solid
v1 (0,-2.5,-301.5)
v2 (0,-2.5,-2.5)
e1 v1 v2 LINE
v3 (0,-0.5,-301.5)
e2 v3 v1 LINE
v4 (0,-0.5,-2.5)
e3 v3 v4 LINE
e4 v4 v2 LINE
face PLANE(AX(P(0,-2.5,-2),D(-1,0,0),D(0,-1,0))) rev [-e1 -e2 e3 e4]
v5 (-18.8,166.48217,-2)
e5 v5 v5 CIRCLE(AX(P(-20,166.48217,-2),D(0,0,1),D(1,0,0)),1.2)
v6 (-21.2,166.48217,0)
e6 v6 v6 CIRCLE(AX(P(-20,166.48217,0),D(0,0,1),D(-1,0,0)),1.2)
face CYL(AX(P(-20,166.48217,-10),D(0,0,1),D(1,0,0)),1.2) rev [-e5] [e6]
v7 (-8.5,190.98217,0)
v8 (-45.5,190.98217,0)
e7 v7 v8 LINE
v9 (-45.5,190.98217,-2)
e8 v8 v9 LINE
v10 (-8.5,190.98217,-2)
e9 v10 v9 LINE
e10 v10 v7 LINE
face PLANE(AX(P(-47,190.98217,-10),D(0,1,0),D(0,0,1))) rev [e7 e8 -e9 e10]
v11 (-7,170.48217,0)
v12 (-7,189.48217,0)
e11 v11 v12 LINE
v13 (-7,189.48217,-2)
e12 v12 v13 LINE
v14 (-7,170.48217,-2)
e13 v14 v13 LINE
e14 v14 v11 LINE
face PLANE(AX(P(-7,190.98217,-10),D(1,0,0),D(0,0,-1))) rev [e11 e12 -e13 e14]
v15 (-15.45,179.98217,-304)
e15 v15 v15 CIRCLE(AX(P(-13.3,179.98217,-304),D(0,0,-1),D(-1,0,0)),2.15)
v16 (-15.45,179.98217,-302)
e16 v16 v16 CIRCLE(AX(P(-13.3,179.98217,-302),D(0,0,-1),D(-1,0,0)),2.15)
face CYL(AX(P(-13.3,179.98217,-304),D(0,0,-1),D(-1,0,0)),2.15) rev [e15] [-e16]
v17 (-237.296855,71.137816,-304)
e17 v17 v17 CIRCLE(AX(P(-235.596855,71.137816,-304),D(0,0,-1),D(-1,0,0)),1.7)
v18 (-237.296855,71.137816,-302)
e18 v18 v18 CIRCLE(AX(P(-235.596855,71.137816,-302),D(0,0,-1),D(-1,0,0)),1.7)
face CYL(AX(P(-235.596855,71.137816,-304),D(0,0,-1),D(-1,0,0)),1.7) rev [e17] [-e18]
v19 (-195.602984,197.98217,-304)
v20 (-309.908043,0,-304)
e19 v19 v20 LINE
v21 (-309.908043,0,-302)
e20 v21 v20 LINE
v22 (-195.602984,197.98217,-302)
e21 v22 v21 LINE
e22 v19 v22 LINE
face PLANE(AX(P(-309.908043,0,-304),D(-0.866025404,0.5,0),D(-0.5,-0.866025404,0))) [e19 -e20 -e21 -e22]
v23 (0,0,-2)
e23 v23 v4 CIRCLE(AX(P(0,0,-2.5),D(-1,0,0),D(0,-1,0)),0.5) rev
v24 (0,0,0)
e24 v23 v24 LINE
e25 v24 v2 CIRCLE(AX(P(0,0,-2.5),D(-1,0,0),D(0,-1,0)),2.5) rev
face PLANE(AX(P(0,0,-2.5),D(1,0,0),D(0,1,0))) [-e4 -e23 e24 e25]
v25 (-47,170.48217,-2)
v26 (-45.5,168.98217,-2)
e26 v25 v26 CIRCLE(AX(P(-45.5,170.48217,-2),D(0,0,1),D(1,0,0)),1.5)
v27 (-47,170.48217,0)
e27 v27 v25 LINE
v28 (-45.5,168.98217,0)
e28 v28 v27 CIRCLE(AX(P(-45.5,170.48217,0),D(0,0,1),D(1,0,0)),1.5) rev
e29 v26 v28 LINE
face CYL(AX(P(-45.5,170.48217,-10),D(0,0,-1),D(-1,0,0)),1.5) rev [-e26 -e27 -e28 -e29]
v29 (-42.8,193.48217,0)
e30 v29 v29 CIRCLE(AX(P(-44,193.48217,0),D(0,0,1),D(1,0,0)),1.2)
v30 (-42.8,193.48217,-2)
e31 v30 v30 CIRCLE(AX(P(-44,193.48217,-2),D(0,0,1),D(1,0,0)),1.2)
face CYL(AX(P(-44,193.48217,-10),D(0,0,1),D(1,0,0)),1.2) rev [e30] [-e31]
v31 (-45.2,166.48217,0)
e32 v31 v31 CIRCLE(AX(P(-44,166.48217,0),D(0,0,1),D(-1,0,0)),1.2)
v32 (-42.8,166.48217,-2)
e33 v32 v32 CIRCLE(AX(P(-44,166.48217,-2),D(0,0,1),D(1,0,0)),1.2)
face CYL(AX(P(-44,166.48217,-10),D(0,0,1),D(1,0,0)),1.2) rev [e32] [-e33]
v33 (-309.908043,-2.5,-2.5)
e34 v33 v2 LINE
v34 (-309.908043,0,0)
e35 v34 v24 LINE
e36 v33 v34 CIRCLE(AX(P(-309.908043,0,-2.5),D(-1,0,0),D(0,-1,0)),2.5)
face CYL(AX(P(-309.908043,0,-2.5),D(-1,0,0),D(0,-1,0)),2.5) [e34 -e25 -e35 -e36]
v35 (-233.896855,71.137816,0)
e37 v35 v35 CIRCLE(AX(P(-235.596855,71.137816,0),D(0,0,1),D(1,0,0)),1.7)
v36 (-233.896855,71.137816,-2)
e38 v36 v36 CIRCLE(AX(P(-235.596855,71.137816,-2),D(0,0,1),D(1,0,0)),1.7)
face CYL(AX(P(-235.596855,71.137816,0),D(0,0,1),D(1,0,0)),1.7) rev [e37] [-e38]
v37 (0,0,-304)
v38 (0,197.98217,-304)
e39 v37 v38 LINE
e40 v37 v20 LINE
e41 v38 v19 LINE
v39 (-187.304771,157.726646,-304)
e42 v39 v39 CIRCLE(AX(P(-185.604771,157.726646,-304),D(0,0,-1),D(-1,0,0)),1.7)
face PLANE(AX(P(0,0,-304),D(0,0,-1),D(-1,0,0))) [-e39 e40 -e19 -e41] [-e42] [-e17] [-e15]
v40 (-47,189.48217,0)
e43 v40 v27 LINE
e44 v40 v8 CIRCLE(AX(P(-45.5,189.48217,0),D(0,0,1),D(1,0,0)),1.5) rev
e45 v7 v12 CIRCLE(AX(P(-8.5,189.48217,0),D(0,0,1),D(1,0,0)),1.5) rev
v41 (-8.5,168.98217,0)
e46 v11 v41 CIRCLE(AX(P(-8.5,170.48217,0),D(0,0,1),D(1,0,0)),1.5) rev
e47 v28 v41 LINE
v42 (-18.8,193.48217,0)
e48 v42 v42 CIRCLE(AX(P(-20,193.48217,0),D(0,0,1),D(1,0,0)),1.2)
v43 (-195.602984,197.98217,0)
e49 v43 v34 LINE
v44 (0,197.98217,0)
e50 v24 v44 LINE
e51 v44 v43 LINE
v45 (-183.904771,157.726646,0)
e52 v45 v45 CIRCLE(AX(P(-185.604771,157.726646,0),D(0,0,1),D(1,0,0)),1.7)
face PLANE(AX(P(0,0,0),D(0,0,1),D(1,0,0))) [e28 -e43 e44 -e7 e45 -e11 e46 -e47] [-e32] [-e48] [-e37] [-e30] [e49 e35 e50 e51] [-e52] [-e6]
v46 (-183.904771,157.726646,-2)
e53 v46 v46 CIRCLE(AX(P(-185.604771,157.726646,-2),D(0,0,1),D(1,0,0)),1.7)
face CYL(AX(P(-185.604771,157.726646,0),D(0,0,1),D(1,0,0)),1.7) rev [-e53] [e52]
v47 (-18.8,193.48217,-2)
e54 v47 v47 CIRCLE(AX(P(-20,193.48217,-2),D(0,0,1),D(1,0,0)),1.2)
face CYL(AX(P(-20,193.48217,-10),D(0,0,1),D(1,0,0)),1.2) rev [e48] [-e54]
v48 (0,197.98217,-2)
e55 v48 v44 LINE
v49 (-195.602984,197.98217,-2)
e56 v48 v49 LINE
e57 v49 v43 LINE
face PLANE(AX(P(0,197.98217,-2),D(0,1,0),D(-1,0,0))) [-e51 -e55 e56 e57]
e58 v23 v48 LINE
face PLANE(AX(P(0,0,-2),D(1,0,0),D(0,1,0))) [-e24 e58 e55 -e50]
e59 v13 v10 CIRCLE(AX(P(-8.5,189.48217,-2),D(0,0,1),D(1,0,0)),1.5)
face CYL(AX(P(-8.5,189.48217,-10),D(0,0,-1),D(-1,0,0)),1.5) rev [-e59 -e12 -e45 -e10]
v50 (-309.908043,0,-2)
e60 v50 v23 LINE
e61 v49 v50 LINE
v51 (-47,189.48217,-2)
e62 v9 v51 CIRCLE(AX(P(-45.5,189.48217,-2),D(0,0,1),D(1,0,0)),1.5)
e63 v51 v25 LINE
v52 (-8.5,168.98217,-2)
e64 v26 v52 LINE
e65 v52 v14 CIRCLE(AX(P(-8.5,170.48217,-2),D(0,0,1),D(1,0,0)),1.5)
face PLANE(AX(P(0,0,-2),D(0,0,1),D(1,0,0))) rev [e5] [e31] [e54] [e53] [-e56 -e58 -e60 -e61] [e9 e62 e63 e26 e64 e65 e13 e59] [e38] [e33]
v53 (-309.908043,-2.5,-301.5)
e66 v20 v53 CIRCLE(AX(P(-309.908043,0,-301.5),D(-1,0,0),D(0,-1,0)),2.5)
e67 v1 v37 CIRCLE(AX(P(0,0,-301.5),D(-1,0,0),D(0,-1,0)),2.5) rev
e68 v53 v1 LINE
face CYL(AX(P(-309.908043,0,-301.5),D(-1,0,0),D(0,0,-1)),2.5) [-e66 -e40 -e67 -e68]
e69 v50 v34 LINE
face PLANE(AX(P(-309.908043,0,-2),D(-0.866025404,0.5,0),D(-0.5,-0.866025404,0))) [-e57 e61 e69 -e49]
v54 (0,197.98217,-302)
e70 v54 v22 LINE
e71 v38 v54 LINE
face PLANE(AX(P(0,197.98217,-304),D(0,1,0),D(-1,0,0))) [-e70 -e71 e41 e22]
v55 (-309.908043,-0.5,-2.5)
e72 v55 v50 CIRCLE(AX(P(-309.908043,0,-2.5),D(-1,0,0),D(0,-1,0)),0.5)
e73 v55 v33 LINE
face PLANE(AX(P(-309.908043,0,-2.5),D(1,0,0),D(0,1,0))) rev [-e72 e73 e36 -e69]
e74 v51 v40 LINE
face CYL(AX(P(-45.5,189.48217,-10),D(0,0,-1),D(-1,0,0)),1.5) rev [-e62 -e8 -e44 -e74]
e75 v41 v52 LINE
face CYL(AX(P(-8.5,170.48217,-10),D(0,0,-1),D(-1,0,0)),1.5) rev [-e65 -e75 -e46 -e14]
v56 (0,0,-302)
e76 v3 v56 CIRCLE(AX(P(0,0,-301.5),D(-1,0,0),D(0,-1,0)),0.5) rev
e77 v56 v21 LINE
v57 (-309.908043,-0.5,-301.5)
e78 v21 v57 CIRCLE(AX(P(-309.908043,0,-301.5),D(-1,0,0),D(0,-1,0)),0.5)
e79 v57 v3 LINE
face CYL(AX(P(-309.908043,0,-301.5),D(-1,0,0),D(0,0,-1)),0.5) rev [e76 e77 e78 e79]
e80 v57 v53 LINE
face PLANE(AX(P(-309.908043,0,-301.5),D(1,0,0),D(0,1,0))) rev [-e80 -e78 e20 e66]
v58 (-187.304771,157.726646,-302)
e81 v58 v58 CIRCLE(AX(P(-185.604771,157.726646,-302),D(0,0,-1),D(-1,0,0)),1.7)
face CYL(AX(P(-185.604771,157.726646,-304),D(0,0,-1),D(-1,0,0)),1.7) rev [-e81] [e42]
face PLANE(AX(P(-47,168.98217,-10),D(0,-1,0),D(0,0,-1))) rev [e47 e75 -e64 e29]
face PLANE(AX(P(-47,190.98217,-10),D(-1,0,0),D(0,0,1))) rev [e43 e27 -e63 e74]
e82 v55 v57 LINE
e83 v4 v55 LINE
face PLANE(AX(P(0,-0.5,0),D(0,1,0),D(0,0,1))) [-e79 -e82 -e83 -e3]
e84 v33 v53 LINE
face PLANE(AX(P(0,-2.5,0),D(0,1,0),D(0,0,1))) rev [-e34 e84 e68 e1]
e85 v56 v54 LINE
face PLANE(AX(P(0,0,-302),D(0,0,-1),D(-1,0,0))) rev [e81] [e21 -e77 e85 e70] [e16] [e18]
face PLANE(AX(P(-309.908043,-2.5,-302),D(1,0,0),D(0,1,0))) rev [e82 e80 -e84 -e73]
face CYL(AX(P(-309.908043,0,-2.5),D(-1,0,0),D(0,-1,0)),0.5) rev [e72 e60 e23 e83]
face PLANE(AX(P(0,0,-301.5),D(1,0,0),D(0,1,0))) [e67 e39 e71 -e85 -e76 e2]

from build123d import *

# Parameters (mm, degrees)
BASE_FLANGE2_DEPTH           = 2
EDGE_FLANGE1_DEPTH           = 309.908043232
EDGE_FLANGE2_STRIP_W         = 9
EDGE_FLANGE2_STRIP_H         = 2
EDGE_FLANGE2_STRIP_CUT_DEPTH = 309.908043232
EDGE_FLANGE2_DEPTH           = 309.908043232
SKETCH23_OUTSIDE_W           = 414.366
SKETCH23_OUTSIDE_H           = 376.458
CUT_EXTRUDE3_DEPTH           = 510.781566222
M3_CLEARANCE_HOLE1_REACH     = 479.133
M3_CLEARANCE_HOLE1_BORE_R    = 1.7
SKETCH50_R                   = 1.2
SKETCH50_W                   = 40
SKETCH50_H                   = 22
CUT_EXTRUDE5_DEPTH           = 10
FILLET1_R                    = 1.5
M4_CLEARANCE_HOLE2_D         = 4.3
M3_CLEARANCE_HOLE2_REACH     = 479.133
M3_CLEARANCE_HOLE2_BORE_R    = 1.7


# Sheet-metal steps are written as plain solids
with BuildPart() as part:
    # Sketch7 → Base-Flange2 (new body)
    with BuildSketch(Plane.XY):
        Polygon((-309.908043232, 0), (-195.602983964, 197.982170213), (0, 197.982170213), (0, 0), align=None)
    extrude(amount=-BASE_FLANGE2_DEPTH)

    # Edge-Flange1 section (across the edge) → Edge-Flange1 (add)
    with BuildSketch(Plane(origin=(0, -0.5, -2), x_dir=(0, 1, 0), z_dir=(-1, 0, 0))):
        with BuildLine():
            Line((-2, 0.5), (-2, 300))
            Line((-2, 300), (0, 300))
            Line((0, 300), (0, 0.5))
            ThreePointArc((0, 0.5), (0.146446609, 0.146446609), (0.5, 0))
            Line((0.5, 0), (0.5, -2))
            ThreePointArc((0.5, -2), (-1.267766953, -1.267766953), (-2, 0.5))
        make_face()
    extrude(amount=EDGE_FLANGE1_DEPTH)

    # Edge-Flange2 strip (across the edge) → Edge-Flange2 strip cut (cut)
    with BuildSketch(Plane(origin=(0, -0.5, -302), x_dir=(0, 0, 1), z_dir=(-1, 0, 0))):
        with Locations((-4, -1)):
            Rectangle(EDGE_FLANGE2_STRIP_W, EDGE_FLANGE2_STRIP_H)
    extrude(amount=EDGE_FLANGE2_STRIP_CUT_DEPTH, mode=Mode.SUBTRACT)

    # Edge-Flange2 section (across the edge) → Edge-Flange2 (add)
    with BuildSketch(Plane(origin=(0, -0.5, -302), x_dir=(0, 0, 1), z_dir=(-1, 0, 0))):
        with BuildLine():
            Line((-2, 0.5), (-2, 270))
            Line((-2, 270), (0, 270))
            Line((0, 270), (0, 0.5))
            ThreePointArc((0, 0.5), (0.146446609, 0.146446609), (0.5, 0))
            Line((0.5, 0), (0.5, -2))
            ThreePointArc((0.5, -2), (-1.267766953, -1.267766953), (-2, 0.5))
        make_face()
    extrude(amount=EDGE_FLANGE2_DEPTH)

    # Sketch23 outside → Cut-Extrude3 (cut, through all)
    with BuildSketch(Plane.XY.offset(-302)):
        with Locations((-154.954, 133.5)):
            Rectangle(SKETCH23_OUTSIDE_W, SKETCH23_OUTSIDE_H)
        Polygon((-309.908043232, 0), (-195.602983964, 197.982170213), (0, 197.982170213), (0, 0), (15.914954138, -38.535343566), (-328.412515317, -22.782185248), align=None, mode=Mode.SUBTRACT)
    extrude(amount=-CUT_EXTRUDE3_DEPTH, mode=Mode.SUBTRACT)

    # M3 Clearance Hole1 bore → M3 Clearance Hole1 (cut, up to next)
    with BuildSketch(Plane(origin=(0, 0, -304), x_dir=(-1, 0, 0), z_dir=(0, 0, -1)), mode=Mode.PRIVATE) as m3_clearance_hole1_sk1:
        with Locations((235.596855298, 71.137815764)):
            Circle(M3_CLEARANCE_HOLE1_BORE_R)
    m3_clearance_hole1_tool1 = extrude(m3_clearance_hole1_sk1.sketch, amount=-M3_CLEARANCE_HOLE1_REACH, mode=Mode.PRIVATE) & part.part
    m3_clearance_hole1 = m3_clearance_hole1_tool1.solids().sort_by_distance((-235.596855, 71.137816, -304))[0]
    add(m3_clearance_hole1, mode=Mode.SUBTRACT)

    # Mirror3: M3 Clearance Hole1 across plane
    add(m3_clearance_hole1.mirror(Plane.XY.offset(-152)), mode=Mode.SUBTRACT)

    # Sketch50 → Cut-Extrude5 (cut)
    with BuildSketch(Plane.XY):
        with Locations((-20, 193.482170213)):
            Circle(SKETCH50_R)
        with Locations((-20, 166.482170213)):
            Circle(SKETCH50_R)
        with Locations((-44, 193.482170213)):
            Circle(SKETCH50_R)
        with Locations((-44, 166.482170213)):
            Circle(SKETCH50_R)
        with Locations((-27, 179.982170213)):
            Rectangle(SKETCH50_W, SKETCH50_H)
    extrude(amount=-CUT_EXTRUDE5_DEPTH, mode=Mode.SUBTRACT)

    # Fillet1
    fillet1_edges = [part.edges().sort_by_distance(p)[0] for p in [
        (-47, 168.982170213, -1),
        (-47, 190.982170213, -1),
        (-7, 190.982170213, -1),
        (-7, 168.982170213, -1),
    ]]
    fillet(fillet1_edges, radius=FILLET1_R)

    # M4 Clearance Hole2 (through all)
    with Locations(Plane(origin=(0, 0, -304), x_dir=(-1, 0, 0), z_dir=(0, 0, -1))):
        with Locations((13.3, 179.982170213)):
            Hole(M4_CLEARANCE_HOLE2_D / 2)

    # M3 Clearance Hole2 bore → M3 Clearance Hole2 (cut, up to next)
    with BuildSketch(Plane(origin=(0, 0, -304), x_dir=(-1, 0, 0), z_dir=(0, 0, -1)), mode=Mode.PRIVATE) as m3_clearance_hole2_sk1:
        with Locations((185.604770825, 157.726646048)):
            Circle(M3_CLEARANCE_HOLE2_BORE_R)
    m3_clearance_hole2_tool1 = extrude(m3_clearance_hole2_sk1.sketch, amount=-M3_CLEARANCE_HOLE2_REACH, mode=Mode.PRIVATE) & part.part
    m3_clearance_hole2 = m3_clearance_hole2_tool1.solids().sort_by_distance((-185.604771, 157.726646, -304))[0]
    add(m3_clearance_hole2, mode=Mode.SUBTRACT)

    # Mirror4: M3 Clearance Hole2 across plane
    add(m3_clearance_hole2.mirror(Plane.XY.offset(-152)), mode=Mode.SUBTRACT)


solid = part.part
